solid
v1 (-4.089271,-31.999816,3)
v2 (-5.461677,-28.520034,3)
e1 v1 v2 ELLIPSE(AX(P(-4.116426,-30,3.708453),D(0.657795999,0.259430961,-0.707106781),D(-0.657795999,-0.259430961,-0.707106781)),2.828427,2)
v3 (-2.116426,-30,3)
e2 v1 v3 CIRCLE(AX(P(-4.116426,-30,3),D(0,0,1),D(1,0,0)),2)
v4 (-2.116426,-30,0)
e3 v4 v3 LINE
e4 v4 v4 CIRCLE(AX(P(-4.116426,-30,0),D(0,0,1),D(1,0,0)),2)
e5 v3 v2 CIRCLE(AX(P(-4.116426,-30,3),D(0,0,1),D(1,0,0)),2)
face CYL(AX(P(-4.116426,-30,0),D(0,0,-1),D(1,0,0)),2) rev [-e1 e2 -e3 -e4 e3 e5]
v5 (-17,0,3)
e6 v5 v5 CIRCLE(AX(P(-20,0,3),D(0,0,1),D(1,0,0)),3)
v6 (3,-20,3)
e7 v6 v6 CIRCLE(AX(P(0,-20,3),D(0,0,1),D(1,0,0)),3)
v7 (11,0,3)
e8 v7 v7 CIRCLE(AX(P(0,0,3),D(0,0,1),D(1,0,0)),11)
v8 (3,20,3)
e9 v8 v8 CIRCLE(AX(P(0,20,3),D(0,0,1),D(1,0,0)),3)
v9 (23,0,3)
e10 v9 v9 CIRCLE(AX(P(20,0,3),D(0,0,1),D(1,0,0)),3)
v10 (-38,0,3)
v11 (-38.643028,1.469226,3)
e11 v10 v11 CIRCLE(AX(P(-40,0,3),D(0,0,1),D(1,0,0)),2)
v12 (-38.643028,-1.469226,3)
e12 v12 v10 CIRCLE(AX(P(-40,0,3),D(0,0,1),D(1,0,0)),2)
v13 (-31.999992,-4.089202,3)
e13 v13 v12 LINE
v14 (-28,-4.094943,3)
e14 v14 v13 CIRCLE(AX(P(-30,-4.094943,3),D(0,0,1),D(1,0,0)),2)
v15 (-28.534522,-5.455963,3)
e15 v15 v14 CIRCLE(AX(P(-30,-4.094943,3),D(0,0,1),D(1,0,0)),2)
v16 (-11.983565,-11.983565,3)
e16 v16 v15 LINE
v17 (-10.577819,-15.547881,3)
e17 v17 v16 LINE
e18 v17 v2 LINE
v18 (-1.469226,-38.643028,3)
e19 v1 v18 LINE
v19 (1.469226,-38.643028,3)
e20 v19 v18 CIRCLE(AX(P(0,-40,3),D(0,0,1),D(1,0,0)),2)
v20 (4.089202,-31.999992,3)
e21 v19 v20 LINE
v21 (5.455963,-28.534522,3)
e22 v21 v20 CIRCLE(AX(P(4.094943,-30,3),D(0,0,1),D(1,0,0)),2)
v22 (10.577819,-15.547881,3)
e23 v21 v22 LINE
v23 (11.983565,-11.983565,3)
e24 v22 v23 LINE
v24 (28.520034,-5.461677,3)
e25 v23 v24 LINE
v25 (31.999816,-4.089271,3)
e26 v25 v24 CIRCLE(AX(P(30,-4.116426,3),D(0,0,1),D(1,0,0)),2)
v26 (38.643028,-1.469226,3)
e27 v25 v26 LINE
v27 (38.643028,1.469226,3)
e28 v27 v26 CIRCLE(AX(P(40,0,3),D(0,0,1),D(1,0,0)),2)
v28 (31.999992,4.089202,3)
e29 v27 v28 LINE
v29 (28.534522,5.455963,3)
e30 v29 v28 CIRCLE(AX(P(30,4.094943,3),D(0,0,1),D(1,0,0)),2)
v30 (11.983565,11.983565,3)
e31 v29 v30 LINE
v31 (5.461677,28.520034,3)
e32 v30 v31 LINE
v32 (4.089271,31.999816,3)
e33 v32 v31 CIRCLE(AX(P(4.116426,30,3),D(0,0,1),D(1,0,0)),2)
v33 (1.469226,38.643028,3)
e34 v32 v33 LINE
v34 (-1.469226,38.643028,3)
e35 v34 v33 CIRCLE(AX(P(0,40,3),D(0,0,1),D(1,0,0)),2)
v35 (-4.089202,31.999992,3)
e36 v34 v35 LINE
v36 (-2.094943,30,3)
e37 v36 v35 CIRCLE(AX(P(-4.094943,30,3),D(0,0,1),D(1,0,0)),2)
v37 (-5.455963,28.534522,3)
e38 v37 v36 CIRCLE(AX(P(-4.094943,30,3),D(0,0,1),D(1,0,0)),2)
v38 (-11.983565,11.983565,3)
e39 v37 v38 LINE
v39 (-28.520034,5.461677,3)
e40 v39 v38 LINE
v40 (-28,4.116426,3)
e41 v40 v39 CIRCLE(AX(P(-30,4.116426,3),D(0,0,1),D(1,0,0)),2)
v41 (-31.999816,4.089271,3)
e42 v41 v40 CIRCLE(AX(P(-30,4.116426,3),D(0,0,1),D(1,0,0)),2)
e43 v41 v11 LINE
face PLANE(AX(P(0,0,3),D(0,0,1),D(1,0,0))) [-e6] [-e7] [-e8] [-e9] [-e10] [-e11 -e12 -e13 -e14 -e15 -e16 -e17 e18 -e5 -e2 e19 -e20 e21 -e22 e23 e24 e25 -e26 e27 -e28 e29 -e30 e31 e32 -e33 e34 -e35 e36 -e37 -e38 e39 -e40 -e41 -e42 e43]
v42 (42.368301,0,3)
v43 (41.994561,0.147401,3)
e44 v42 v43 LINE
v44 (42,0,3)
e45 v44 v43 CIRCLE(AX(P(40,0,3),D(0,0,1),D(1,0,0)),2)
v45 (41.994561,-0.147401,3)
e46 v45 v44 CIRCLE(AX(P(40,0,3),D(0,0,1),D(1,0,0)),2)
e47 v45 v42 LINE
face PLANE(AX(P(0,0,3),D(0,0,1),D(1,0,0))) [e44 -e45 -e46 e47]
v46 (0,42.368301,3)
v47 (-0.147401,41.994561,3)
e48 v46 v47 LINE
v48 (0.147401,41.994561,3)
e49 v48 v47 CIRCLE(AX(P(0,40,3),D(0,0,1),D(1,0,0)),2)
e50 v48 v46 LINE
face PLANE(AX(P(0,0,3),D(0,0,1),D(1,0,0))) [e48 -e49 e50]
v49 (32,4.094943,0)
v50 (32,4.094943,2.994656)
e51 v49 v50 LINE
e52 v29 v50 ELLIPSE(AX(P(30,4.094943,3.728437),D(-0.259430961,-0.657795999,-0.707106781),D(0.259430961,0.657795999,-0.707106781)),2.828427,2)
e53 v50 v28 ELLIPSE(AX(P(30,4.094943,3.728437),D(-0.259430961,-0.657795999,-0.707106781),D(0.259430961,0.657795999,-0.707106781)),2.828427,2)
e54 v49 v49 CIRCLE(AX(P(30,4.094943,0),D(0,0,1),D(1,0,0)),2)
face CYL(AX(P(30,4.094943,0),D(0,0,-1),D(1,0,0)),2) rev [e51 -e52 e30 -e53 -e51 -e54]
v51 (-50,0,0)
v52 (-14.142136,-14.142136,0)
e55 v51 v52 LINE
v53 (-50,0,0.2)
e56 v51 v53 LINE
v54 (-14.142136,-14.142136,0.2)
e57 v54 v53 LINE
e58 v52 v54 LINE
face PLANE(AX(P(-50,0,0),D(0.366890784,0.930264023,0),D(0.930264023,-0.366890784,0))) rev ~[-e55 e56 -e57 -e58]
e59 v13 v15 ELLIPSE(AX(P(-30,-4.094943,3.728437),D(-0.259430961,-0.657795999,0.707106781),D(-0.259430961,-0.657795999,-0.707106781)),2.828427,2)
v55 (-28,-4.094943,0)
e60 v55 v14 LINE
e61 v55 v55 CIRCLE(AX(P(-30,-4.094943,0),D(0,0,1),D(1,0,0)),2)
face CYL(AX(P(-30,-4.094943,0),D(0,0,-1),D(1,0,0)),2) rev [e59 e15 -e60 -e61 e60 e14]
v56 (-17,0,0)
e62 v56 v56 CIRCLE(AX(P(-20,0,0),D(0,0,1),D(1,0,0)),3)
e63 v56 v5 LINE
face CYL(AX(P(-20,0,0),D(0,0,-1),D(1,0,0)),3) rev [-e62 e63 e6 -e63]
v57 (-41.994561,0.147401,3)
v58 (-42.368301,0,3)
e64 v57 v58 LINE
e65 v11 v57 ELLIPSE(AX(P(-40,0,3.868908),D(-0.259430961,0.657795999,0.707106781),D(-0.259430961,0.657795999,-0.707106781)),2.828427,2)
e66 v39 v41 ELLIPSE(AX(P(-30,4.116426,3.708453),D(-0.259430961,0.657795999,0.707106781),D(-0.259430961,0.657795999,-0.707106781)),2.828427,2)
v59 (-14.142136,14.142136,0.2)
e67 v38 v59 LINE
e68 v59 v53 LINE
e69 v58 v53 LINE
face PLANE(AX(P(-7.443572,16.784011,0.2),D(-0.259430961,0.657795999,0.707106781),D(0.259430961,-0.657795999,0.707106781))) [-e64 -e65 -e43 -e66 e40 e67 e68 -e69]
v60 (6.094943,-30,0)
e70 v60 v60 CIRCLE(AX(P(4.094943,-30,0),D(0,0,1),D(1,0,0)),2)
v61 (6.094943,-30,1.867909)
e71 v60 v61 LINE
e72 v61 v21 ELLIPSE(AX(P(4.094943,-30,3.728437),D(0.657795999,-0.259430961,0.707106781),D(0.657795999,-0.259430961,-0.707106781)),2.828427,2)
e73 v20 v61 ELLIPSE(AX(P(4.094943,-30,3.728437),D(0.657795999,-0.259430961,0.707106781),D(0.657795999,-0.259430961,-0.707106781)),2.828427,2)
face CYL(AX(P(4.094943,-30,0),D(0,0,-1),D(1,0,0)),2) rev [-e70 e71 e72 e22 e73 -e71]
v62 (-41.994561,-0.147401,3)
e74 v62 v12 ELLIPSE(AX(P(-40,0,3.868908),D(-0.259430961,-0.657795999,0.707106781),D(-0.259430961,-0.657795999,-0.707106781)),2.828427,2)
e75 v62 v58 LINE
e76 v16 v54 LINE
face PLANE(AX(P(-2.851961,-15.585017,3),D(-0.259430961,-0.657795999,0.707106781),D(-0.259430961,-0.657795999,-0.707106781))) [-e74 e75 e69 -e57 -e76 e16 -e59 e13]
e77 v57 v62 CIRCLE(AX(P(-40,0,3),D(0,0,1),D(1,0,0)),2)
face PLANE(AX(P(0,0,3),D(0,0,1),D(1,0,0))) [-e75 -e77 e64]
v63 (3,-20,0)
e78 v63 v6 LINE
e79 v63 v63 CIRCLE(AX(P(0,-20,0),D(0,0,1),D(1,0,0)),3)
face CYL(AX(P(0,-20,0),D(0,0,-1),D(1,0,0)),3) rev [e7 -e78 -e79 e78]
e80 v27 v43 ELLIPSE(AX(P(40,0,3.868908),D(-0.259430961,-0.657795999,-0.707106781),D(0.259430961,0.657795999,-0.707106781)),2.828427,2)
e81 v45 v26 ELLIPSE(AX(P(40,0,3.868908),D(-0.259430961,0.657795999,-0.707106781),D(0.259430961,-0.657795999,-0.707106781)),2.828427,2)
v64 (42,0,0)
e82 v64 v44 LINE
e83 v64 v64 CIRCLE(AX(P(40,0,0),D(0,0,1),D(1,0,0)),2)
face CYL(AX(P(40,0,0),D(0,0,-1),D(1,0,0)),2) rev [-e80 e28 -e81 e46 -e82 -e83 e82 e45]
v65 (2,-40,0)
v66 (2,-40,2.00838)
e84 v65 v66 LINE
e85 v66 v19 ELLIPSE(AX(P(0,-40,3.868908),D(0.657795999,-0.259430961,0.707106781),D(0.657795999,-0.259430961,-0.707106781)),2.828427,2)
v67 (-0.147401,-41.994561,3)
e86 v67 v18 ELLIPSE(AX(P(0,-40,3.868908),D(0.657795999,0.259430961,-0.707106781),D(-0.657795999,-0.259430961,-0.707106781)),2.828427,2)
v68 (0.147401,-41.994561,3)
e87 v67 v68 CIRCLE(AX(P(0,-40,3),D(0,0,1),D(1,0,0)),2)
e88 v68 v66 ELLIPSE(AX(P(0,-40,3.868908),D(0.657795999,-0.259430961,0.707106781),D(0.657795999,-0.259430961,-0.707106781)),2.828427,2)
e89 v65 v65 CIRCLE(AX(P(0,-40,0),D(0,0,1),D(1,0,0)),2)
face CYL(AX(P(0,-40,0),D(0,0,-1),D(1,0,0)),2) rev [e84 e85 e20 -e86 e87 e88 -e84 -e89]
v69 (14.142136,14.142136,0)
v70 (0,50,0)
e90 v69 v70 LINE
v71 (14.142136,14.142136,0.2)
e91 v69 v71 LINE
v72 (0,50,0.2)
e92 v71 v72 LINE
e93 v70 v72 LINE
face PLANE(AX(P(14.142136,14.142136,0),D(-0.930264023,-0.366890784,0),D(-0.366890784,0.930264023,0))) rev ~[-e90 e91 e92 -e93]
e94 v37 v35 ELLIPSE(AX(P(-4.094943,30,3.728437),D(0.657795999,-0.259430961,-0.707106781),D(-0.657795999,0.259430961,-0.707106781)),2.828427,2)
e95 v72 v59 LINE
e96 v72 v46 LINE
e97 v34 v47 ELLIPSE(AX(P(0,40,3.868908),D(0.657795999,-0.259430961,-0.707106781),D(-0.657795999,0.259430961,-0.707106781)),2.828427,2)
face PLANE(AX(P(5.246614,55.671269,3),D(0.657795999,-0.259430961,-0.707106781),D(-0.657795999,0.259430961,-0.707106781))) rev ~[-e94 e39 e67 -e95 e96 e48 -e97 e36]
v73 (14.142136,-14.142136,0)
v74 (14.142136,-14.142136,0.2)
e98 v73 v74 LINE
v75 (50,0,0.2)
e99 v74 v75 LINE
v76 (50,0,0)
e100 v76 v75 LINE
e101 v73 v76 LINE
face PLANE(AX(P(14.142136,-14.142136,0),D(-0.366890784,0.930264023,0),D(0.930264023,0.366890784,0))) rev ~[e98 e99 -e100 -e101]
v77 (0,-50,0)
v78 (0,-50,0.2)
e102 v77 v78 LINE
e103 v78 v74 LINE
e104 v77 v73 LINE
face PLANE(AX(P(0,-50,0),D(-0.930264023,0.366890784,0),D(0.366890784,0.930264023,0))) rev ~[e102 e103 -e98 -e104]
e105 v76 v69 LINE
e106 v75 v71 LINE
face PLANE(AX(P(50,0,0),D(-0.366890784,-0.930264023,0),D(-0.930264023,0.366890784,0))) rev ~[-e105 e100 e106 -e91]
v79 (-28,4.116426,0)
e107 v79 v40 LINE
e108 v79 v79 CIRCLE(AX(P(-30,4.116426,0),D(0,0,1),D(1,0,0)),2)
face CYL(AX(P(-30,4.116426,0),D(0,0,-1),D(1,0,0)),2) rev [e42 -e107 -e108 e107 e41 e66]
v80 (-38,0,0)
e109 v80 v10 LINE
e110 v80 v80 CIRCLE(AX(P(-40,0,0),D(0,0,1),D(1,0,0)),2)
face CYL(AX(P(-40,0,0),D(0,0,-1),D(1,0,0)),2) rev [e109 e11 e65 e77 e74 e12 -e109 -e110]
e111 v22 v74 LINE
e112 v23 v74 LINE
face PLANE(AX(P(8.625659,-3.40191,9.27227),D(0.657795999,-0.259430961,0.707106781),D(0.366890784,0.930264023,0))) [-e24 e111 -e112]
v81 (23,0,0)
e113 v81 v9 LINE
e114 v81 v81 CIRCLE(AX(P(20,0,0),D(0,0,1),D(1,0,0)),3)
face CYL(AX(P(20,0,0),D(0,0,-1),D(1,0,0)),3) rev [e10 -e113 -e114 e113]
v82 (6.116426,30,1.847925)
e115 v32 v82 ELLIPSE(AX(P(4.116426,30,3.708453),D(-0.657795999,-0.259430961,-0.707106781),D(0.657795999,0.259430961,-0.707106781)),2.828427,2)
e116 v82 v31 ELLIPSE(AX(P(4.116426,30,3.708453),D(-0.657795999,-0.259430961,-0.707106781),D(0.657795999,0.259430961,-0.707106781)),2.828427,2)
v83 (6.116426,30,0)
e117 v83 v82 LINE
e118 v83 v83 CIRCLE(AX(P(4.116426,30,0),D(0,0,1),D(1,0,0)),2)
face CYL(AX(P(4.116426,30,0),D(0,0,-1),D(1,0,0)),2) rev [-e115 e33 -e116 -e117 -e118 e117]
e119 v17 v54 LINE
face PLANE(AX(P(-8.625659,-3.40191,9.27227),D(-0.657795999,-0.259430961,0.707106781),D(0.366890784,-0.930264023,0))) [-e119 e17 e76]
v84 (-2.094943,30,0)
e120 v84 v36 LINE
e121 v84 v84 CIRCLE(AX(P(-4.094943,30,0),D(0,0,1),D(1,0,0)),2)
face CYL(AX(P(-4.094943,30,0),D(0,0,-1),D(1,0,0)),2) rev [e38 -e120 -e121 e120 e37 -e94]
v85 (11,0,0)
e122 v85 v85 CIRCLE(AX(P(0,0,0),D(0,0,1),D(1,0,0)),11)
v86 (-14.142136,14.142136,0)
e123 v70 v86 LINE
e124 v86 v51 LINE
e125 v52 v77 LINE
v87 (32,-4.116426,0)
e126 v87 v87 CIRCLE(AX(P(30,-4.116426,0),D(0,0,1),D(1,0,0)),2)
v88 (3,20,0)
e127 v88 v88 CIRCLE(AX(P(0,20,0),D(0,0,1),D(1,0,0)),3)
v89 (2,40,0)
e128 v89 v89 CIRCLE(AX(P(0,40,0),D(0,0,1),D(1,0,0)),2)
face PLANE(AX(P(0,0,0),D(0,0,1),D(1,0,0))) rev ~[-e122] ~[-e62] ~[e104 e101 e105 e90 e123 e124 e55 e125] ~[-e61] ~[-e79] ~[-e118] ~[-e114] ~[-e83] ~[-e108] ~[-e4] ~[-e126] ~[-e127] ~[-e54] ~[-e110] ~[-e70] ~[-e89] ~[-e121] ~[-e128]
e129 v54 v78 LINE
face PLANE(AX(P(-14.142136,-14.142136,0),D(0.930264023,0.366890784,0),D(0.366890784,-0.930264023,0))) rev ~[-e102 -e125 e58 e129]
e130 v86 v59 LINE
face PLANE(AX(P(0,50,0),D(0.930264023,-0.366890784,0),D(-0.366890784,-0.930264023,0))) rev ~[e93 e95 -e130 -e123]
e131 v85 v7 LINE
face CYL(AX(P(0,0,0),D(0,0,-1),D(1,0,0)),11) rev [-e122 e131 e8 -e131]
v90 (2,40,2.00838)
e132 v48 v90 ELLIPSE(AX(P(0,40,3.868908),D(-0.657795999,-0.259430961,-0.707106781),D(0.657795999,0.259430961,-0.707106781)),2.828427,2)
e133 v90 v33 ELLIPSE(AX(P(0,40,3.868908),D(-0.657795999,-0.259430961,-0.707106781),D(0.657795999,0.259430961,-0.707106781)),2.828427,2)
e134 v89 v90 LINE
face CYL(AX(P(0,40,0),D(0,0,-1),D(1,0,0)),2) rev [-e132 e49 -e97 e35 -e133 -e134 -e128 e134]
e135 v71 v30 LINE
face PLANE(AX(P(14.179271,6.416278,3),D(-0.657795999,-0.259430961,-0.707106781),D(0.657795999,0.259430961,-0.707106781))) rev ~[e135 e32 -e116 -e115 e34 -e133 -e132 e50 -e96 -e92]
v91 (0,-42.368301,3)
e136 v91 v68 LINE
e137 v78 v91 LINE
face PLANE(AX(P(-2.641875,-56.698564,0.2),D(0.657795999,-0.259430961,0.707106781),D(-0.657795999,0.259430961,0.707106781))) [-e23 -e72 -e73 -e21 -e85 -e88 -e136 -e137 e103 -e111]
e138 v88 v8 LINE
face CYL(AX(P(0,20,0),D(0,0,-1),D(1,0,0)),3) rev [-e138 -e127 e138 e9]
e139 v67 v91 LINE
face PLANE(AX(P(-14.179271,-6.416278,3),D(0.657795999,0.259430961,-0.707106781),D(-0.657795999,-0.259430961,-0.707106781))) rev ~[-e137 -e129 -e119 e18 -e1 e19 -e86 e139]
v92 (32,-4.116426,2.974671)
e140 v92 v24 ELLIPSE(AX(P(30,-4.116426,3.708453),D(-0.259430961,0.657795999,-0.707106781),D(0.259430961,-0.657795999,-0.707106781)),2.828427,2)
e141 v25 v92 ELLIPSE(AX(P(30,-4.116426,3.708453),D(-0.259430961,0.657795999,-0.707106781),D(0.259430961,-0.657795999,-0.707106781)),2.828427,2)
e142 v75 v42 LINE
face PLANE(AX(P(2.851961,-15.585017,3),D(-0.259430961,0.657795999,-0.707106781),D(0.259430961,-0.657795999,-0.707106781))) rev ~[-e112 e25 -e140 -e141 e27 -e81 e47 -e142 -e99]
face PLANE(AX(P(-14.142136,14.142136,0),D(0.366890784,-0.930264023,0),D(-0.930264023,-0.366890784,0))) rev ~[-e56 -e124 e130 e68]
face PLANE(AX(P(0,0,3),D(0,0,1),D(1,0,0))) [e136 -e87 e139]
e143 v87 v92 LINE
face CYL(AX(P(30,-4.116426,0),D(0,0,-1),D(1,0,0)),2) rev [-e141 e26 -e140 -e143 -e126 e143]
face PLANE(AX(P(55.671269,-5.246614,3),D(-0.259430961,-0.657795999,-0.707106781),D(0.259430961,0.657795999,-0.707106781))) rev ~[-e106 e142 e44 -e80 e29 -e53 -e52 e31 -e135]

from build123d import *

# Parameters (mm, degrees)
F0_R         = 2
F0_R_2       = 3
F0_R_3       = 11
F1_DEPTH     = 3
F2_T4_DEPTH  = 52.9473251324
F3_T4_DEPTH  = 48.8454257103
F4_T4_DEPTH  = 56.77883553
F4_T10_DEPTH = 56.77883553
F4_T15_DEPTH = 52.9473251324
F4_T20_DEPTH = 52.9473251324
F4_T25_DEPTH = 56.77883553
F4_T31_DEPTH = 56.77883553
F4_T36_DEPTH = 52.9473251324
F4_T41_DEPTH = 52.9473251324
F4_T47_DEPTH = 52.9473251324
F4_T51_DEPTH = 52.9473251324
F4_T58_DEPTH = 52.9473251324
F4_T62_DEPTH = 52.9473251324


# Not quite as in the source:
# - a fillet or chamfer that OpenCascade refuses, or shapes differently, is made with other operations: its cross-section is extruded or revolved along the edge and cut away or added


with BuildPart() as f1:
    # F0 (on Top) → F1 (new body)
    with BuildSketch(Plane.XY):
        Polygon((-14.1421356237, 14.1421356237), (-50, 0), (-14.1421356237, -14.1421356237), (0, -50), (14.1421356237, -14.1421356237), (50, 0), (14.1421356237, 14.1421356237), (0, 50), align=None)
        with Locations((-4.1164257564, -30)):
            Circle(F0_R, mode=Mode.SUBTRACT)
        with Locations((-30, -4.0949434042)):
            Circle(F0_R, mode=Mode.SUBTRACT)
        with Locations((0, -40)):
            Circle(F0_R, mode=Mode.SUBTRACT)
        with Locations((4.0949434042, -30)):
            Circle(F0_R, mode=Mode.SUBTRACT)
        with Locations((0, -20)):
            Circle(F0_R_2, mode=Mode.SUBTRACT)
        with Locations((30, -4.1164257564)):
            Circle(F0_R, mode=Mode.SUBTRACT)
        with Locations((-40, 0)):
            Circle(F0_R, mode=Mode.SUBTRACT)
        with Locations((-30, 4.1164257564)):
            Circle(F0_R, mode=Mode.SUBTRACT)
        with Locations((-20, 0)):
            Circle(F0_R_2, mode=Mode.SUBTRACT)
        with Locations((-4.0949434042, 30)):
            Circle(F0_R, mode=Mode.SUBTRACT)
        Circle(F0_R_3, mode=Mode.SUBTRACT)
        with Locations((20, 0)):
            Circle(F0_R_2, mode=Mode.SUBTRACT)
        with Locations((0, 20)):
            Circle(F0_R_2, mode=Mode.SUBTRACT)
        with Locations((30, 4.0949434042)):
            Circle(F0_R, mode=Mode.SUBTRACT)
        with Locations((40, 0)):
            Circle(F0_R, mode=Mode.SUBTRACT)
        with Locations((4.1164257564, 30)):
            Circle(F0_R, mode=Mode.SUBTRACT)
        with Locations((0, 40)):
            Circle(F0_R, mode=Mode.SUBTRACT)
    extrude(amount=F1_DEPTH)

    # F2: chamfer of 2.8 on 1 edges, made by hand


with BuildPart() as f2_tool2:
    # F2_s3 → F2_t4 (new body)
    with BuildSketch(Plane(origin=(-19.7071398503, -49.9681212794, 0), x_dir=(0, 0, 1), z_dir=(0.3668907842, 0.930264023, 0))):
        Polygon((0.2, 18.3445392079), (3, 15.5445392079), (3, 18.3445392079), align=None)
    extrude(amount=F2_T4_DEPTH)

    split(bisect_by=Plane(origin=(6.730442375, -17.0652648437, 0), x_dir=(0, 0, 1), z_dir=(0.3668907842, -0.930264023, 0)), keep=Keep.TOP)


with BuildPart() as f1_1:
    add(f1.part)

    # F2_t1: cut F2_tool2
    add(f2_tool2.part, mode=Mode.SUBTRACT)

    # F3: chamfer of 2.8 on 1 edges, made by hand


with BuildPart() as f3_tool2:
    # F3_s3 → F3_t4 (new body)
    with BuildSketch(Plane(origin=(0.2812542134, -0.7131295943, 0), x_dir=(0, 0, 1), z_dir=(0.3668907842, -0.930264023, 0))):
        Polygon((3, 15.5445392079), (0.2, 18.3445392079), (3, 18.3445392079), align=None)
    extrude(amount=F3_T4_DEPTH)

    split(bisect_by=Plane(origin=(-6.730442375, -17.0652648437, 0), x_dir=(0, 0, 1), z_dir=(-0.3668907842, -0.930264023, 0)), keep=Keep.TOP)


with BuildPart() as f1_2:
    add(f1_1.part)

    # F3_t1: cut F3_tool2
    add(f3_tool2.part, mode=Mode.SUBTRACT)

    # F4: chamfer of 2.8 on 6 edges, made by hand


with BuildPart() as f4_tool2:
    # F4_s3 → F4_t4 (new body)
    with BuildSketch(Plane(origin=(-2.8511866823, -1.1244916409, 0), x_dir=(0, 0, 1), z_dir=(0.930264023, 0.3668907842, 0))):
        Polygon((3, 15.5445392079), (0.2, 18.3445392079), (3, 18.3445392079), align=None)
    extrude(amount=F4_T4_DEPTH)

    split(bisect_by=Plane(origin=(17.0652648437, -6.730442375, 0), x_dir=(0, 0, 1), z_dir=(-0.930264023, 0.3668907842, 0)), keep=Keep.TOP)

    split(bisect_by=Plane(origin=(8.6256588242, -3.4019102659, 9.272269604), x_dir=(0.3668907842, 0.930264023, 0), z_dir=(0.657795999, -0.2594309614, 0.7071067812)), keep=Keep.TOP)


with BuildPart() as f1_3:
    add(f1_2.part)

    # F4_t1: cut F4_tool2
    add(f4_tool2.part, mode=Mode.SUBTRACT)


with BuildPart() as f4_tool8:
    # F4_s9 → F4_t10 (new body)
    with BuildSketch(Plane(origin=(-2.8511866823, -1.1244916409, 0), x_dir=(0, 0, 1), z_dir=(0.930264023, 0.3668907842, 0))):
        Polygon((3, 15.5445392079), (0.2, 18.3445392079), (3, 18.3445392079), align=None)
    extrude(amount=F4_T10_DEPTH)

    split(bisect_by=Plane(origin=(17.0652648437, -6.730442375, 0), x_dir=(0, 0, 1), z_dir=(0.930264023, -0.3668907842, 0)), keep=Keep.TOP)


with BuildPart() as f1_4:
    add(f1_3.part)

    # F4_t7: cut F4_tool8
    add(f4_tool8.part, mode=Mode.SUBTRACT)


with BuildPart() as f4_tool13:
    # F4_s14 → F4_t15 (new body)
    with BuildSketch(Plane(origin=(49.9681212794, -19.7071398503, 0), x_dir=(0, 0, 1), z_dir=(-0.930264023, 0.3668907842, 0))):
        Polygon((3, 15.5445392079), (0.2, 18.3445392079), (3, 18.3445392079), align=None)
    extrude(amount=F4_T15_DEPTH)

    split(bisect_by=Plane(origin=(17.0652648437, 6.730442375, 0), x_dir=(0, 0, 1), z_dir=(0.930264023, 0.3668907842, 0)), keep=Keep.TOP)


with BuildPart() as f1_5:
    add(f1_4.part)

    # F4_t12: cut F4_tool13
    add(f4_tool13.part, mode=Mode.SUBTRACT)


with BuildPart() as f4_tool18:
    # F4_s19 → F4_t20 (new body)
    with BuildSketch(Plane(origin=(-0.2812542134, 0.7131295943, 0), x_dir=(0, 0, 1), z_dir=(-0.3668907842, 0.930264023, 0))):
        Polygon((3, 15.5445392079), (0.2, 18.3445392079), (3, 18.3445392079), align=None)
    extrude(amount=F4_T20_DEPTH)

    split(bisect_by=Plane(origin=(6.730442375, 17.0652648437, 0), x_dir=(0, 0, 1), z_dir=(0.3668907842, 0.930264023, 0)), keep=Keep.TOP)


with BuildPart() as f1_6:
    add(f1_5.part)

    # F4_t17: cut F4_tool18
    add(f4_tool18.part, mode=Mode.SUBTRACT)


with BuildPart() as f4_tool23:
    # F4_s24 → F4_t25 (new body)
    with BuildSketch(Plane(origin=(2.8511866823, -1.1244916409, 0), x_dir=(0, 0, 1), z_dir=(-0.930264023, 0.3668907842, 0))):
        Polygon((3, -15.5445392079), (0.2, -18.3445392079), (3, -18.3445392079), align=None)
    extrude(amount=F4_T25_DEPTH)

    split(bisect_by=Plane(origin=(-17.0652648437, -6.730442375, 0), x_dir=(0, 0, 1), z_dir=(0.930264023, 0.3668907842, 0)), keep=Keep.TOP)

    split(bisect_by=Plane(origin=(-8.6256588242, -3.4019102659, 9.272269604), x_dir=(0.3668907842, -0.930264023, 0), z_dir=(-0.657795999, -0.2594309614, 0.7071067812)), keep=Keep.TOP)


with BuildPart() as f1_7:
    add(f1_6.part)

    # F4_t22: cut F4_tool23
    add(f4_tool23.part, mode=Mode.SUBTRACT)


with BuildPart() as f4_tool29:
    # F4_s30 → F4_t31 (new body)
    with BuildSketch(Plane(origin=(2.8511866823, -1.1244916409, 0), x_dir=(0, 0, 1), z_dir=(-0.930264023, 0.3668907842, 0))):
        Polygon((3, -15.5445392079), (0.2, -18.3445392079), (3, -18.3445392079), align=None)
    extrude(amount=F4_T31_DEPTH)

    split(bisect_by=Plane(origin=(-17.0652648437, -6.730442375, 0), x_dir=(0, 0, 1), z_dir=(-0.930264023, -0.3668907842, 0)), keep=Keep.TOP)


with BuildPart() as f1_8:
    add(f1_7.part)

    # F4_t28: cut F4_tool29
    add(f4_tool29.part, mode=Mode.SUBTRACT)


with BuildPart() as f4_tool34:
    # F4_s35 → F4_t36 (new body)
    with BuildSketch(Plane(origin=(-0.7131295943, -0.2812542134, 0), x_dir=(0, 0, 1), z_dir=(-0.930264023, -0.3668907842, 0))):
        Polygon((0.2, 18.3445392079), (3, 15.5445392079), (3, 18.3445392079), align=None)
    extrude(amount=F4_T36_DEPTH)

    split(bisect_by=Plane(origin=(-17.0652648437, 6.730442375, 0), x_dir=(0, 0, 1), z_dir=(-0.930264023, 0.3668907842, 0)), keep=Keep.TOP)


with BuildPart() as f1_9:
    add(f1_8.part)

    # F4_t33: cut F4_tool34
    add(f4_tool34.part, mode=Mode.SUBTRACT)


with BuildPart() as f4_tool39:
    # F4_s40 → F4_t41 (new body)
    with BuildSketch(Plane(origin=(19.7071398503, 49.9681212794, 0), x_dir=(0, 0, 1), z_dir=(-0.3668907842, -0.930264023, 0))):
        Polygon((3, 15.5445392079), (0.2, 18.3445392079), (3, 18.3445392079), align=None)
    extrude(amount=F4_T41_DEPTH)

    split(bisect_by=Plane(origin=(-6.730442375, 17.0652648437, 0), x_dir=(0, 0, 1), z_dir=(-0.3668907842, 0.930264023, 0)), keep=Keep.TOP)


with BuildPart() as f1_10:
    add(f1_9.part)

    # F4_t38: cut F4_tool39
    add(f4_tool39.part, mode=Mode.SUBTRACT)


with BuildPart() as f4_tool45:
    # F4_s46 → F4_t47 (new body)
    with BuildSketch(Plane(origin=(-0.2812542134, 0.7131295943, 0), x_dir=(0, 0, 1), z_dir=(-0.3668907842, 0.930264023, 0))):
        Polygon((3, 15.5445392079), (0.2, 18.3445392079), (3, 18.3445392079), align=None)
    extrude(amount=F4_T47_DEPTH)

    split(bisect_by=Plane(origin=(6.730442375, 17.0652648437, 0), x_dir=(0, 0, 1), z_dir=(-0.3668907842, -0.930264023, 0)), keep=Keep.TOP)


with BuildPart() as f4_tool49:
    # F4_s50 → F4_t51 (new body)
    with BuildSketch(Plane(origin=(49.9681212794, -19.7071398503, 0), x_dir=(0, 0, 1), z_dir=(-0.930264023, 0.3668907842, 0))):
        Polygon((3, 15.5445392079), (0.2, 18.3445392079), (3, 18.3445392079), align=None)
    extrude(amount=F4_T51_DEPTH)

    split(bisect_by=Plane(origin=(17.0652648437, 6.730442375, 0), x_dir=(0, 0, 1), z_dir=(-0.930264023, -0.3668907842, 0)), keep=Keep.TOP)


with BuildPart() as f4_tool45_1:
    add(f4_tool45.part)

    # F4_t53: intersect F4_tool49
    add(f4_tool49.part, mode=Mode.INTERSECT)


with BuildPart() as f1_11:
    add(f1_10.part)

    # F4_t43: cut F4_tool45
    add(f4_tool45_1.part, mode=Mode.SUBTRACT)


with BuildPart() as f4_tool56:
    # F4_s57 → F4_t58 (new body)
    with BuildSketch(Plane(origin=(-0.7131295943, -0.2812542134, 0), x_dir=(0, 0, 1), z_dir=(-0.930264023, -0.3668907842, 0))):
        Polygon((0.2, 18.3445392079), (3, 15.5445392079), (3, 18.3445392079), align=None)
    extrude(amount=F4_T58_DEPTH)

    split(bisect_by=Plane(origin=(-17.0652648437, 6.730442375, 0), x_dir=(0, 0, 1), z_dir=(0.930264023, -0.3668907842, 0)), keep=Keep.TOP)


with BuildPart() as f4_tool60:
    # F4_s61 → F4_t62 (new body)
    with BuildSketch(Plane(origin=(19.7071398503, 49.9681212794, 0), x_dir=(0, 0, 1), z_dir=(-0.3668907842, -0.930264023, 0))):
        Polygon((3, 15.5445392079), (0.2, 18.3445392079), (3, 18.3445392079), align=None)
    extrude(amount=F4_T62_DEPTH)

    split(bisect_by=Plane(origin=(-6.730442375, 17.0652648437, 0), x_dir=(0, 0, 1), z_dir=(0.3668907842, -0.930264023, 0)), keep=Keep.TOP)


with BuildPart() as f4_tool56_1:
    add(f4_tool56.part)

    # F4_t64: intersect F4_tool60
    add(f4_tool60.part, mode=Mode.INTERSECT)


with BuildPart() as f1_12:
    add(f1_11.part)

    # F4_t54: cut F4_tool56
    add(f4_tool56_1.part, mode=Mode.SUBTRACT)


solid = f1_12.part
